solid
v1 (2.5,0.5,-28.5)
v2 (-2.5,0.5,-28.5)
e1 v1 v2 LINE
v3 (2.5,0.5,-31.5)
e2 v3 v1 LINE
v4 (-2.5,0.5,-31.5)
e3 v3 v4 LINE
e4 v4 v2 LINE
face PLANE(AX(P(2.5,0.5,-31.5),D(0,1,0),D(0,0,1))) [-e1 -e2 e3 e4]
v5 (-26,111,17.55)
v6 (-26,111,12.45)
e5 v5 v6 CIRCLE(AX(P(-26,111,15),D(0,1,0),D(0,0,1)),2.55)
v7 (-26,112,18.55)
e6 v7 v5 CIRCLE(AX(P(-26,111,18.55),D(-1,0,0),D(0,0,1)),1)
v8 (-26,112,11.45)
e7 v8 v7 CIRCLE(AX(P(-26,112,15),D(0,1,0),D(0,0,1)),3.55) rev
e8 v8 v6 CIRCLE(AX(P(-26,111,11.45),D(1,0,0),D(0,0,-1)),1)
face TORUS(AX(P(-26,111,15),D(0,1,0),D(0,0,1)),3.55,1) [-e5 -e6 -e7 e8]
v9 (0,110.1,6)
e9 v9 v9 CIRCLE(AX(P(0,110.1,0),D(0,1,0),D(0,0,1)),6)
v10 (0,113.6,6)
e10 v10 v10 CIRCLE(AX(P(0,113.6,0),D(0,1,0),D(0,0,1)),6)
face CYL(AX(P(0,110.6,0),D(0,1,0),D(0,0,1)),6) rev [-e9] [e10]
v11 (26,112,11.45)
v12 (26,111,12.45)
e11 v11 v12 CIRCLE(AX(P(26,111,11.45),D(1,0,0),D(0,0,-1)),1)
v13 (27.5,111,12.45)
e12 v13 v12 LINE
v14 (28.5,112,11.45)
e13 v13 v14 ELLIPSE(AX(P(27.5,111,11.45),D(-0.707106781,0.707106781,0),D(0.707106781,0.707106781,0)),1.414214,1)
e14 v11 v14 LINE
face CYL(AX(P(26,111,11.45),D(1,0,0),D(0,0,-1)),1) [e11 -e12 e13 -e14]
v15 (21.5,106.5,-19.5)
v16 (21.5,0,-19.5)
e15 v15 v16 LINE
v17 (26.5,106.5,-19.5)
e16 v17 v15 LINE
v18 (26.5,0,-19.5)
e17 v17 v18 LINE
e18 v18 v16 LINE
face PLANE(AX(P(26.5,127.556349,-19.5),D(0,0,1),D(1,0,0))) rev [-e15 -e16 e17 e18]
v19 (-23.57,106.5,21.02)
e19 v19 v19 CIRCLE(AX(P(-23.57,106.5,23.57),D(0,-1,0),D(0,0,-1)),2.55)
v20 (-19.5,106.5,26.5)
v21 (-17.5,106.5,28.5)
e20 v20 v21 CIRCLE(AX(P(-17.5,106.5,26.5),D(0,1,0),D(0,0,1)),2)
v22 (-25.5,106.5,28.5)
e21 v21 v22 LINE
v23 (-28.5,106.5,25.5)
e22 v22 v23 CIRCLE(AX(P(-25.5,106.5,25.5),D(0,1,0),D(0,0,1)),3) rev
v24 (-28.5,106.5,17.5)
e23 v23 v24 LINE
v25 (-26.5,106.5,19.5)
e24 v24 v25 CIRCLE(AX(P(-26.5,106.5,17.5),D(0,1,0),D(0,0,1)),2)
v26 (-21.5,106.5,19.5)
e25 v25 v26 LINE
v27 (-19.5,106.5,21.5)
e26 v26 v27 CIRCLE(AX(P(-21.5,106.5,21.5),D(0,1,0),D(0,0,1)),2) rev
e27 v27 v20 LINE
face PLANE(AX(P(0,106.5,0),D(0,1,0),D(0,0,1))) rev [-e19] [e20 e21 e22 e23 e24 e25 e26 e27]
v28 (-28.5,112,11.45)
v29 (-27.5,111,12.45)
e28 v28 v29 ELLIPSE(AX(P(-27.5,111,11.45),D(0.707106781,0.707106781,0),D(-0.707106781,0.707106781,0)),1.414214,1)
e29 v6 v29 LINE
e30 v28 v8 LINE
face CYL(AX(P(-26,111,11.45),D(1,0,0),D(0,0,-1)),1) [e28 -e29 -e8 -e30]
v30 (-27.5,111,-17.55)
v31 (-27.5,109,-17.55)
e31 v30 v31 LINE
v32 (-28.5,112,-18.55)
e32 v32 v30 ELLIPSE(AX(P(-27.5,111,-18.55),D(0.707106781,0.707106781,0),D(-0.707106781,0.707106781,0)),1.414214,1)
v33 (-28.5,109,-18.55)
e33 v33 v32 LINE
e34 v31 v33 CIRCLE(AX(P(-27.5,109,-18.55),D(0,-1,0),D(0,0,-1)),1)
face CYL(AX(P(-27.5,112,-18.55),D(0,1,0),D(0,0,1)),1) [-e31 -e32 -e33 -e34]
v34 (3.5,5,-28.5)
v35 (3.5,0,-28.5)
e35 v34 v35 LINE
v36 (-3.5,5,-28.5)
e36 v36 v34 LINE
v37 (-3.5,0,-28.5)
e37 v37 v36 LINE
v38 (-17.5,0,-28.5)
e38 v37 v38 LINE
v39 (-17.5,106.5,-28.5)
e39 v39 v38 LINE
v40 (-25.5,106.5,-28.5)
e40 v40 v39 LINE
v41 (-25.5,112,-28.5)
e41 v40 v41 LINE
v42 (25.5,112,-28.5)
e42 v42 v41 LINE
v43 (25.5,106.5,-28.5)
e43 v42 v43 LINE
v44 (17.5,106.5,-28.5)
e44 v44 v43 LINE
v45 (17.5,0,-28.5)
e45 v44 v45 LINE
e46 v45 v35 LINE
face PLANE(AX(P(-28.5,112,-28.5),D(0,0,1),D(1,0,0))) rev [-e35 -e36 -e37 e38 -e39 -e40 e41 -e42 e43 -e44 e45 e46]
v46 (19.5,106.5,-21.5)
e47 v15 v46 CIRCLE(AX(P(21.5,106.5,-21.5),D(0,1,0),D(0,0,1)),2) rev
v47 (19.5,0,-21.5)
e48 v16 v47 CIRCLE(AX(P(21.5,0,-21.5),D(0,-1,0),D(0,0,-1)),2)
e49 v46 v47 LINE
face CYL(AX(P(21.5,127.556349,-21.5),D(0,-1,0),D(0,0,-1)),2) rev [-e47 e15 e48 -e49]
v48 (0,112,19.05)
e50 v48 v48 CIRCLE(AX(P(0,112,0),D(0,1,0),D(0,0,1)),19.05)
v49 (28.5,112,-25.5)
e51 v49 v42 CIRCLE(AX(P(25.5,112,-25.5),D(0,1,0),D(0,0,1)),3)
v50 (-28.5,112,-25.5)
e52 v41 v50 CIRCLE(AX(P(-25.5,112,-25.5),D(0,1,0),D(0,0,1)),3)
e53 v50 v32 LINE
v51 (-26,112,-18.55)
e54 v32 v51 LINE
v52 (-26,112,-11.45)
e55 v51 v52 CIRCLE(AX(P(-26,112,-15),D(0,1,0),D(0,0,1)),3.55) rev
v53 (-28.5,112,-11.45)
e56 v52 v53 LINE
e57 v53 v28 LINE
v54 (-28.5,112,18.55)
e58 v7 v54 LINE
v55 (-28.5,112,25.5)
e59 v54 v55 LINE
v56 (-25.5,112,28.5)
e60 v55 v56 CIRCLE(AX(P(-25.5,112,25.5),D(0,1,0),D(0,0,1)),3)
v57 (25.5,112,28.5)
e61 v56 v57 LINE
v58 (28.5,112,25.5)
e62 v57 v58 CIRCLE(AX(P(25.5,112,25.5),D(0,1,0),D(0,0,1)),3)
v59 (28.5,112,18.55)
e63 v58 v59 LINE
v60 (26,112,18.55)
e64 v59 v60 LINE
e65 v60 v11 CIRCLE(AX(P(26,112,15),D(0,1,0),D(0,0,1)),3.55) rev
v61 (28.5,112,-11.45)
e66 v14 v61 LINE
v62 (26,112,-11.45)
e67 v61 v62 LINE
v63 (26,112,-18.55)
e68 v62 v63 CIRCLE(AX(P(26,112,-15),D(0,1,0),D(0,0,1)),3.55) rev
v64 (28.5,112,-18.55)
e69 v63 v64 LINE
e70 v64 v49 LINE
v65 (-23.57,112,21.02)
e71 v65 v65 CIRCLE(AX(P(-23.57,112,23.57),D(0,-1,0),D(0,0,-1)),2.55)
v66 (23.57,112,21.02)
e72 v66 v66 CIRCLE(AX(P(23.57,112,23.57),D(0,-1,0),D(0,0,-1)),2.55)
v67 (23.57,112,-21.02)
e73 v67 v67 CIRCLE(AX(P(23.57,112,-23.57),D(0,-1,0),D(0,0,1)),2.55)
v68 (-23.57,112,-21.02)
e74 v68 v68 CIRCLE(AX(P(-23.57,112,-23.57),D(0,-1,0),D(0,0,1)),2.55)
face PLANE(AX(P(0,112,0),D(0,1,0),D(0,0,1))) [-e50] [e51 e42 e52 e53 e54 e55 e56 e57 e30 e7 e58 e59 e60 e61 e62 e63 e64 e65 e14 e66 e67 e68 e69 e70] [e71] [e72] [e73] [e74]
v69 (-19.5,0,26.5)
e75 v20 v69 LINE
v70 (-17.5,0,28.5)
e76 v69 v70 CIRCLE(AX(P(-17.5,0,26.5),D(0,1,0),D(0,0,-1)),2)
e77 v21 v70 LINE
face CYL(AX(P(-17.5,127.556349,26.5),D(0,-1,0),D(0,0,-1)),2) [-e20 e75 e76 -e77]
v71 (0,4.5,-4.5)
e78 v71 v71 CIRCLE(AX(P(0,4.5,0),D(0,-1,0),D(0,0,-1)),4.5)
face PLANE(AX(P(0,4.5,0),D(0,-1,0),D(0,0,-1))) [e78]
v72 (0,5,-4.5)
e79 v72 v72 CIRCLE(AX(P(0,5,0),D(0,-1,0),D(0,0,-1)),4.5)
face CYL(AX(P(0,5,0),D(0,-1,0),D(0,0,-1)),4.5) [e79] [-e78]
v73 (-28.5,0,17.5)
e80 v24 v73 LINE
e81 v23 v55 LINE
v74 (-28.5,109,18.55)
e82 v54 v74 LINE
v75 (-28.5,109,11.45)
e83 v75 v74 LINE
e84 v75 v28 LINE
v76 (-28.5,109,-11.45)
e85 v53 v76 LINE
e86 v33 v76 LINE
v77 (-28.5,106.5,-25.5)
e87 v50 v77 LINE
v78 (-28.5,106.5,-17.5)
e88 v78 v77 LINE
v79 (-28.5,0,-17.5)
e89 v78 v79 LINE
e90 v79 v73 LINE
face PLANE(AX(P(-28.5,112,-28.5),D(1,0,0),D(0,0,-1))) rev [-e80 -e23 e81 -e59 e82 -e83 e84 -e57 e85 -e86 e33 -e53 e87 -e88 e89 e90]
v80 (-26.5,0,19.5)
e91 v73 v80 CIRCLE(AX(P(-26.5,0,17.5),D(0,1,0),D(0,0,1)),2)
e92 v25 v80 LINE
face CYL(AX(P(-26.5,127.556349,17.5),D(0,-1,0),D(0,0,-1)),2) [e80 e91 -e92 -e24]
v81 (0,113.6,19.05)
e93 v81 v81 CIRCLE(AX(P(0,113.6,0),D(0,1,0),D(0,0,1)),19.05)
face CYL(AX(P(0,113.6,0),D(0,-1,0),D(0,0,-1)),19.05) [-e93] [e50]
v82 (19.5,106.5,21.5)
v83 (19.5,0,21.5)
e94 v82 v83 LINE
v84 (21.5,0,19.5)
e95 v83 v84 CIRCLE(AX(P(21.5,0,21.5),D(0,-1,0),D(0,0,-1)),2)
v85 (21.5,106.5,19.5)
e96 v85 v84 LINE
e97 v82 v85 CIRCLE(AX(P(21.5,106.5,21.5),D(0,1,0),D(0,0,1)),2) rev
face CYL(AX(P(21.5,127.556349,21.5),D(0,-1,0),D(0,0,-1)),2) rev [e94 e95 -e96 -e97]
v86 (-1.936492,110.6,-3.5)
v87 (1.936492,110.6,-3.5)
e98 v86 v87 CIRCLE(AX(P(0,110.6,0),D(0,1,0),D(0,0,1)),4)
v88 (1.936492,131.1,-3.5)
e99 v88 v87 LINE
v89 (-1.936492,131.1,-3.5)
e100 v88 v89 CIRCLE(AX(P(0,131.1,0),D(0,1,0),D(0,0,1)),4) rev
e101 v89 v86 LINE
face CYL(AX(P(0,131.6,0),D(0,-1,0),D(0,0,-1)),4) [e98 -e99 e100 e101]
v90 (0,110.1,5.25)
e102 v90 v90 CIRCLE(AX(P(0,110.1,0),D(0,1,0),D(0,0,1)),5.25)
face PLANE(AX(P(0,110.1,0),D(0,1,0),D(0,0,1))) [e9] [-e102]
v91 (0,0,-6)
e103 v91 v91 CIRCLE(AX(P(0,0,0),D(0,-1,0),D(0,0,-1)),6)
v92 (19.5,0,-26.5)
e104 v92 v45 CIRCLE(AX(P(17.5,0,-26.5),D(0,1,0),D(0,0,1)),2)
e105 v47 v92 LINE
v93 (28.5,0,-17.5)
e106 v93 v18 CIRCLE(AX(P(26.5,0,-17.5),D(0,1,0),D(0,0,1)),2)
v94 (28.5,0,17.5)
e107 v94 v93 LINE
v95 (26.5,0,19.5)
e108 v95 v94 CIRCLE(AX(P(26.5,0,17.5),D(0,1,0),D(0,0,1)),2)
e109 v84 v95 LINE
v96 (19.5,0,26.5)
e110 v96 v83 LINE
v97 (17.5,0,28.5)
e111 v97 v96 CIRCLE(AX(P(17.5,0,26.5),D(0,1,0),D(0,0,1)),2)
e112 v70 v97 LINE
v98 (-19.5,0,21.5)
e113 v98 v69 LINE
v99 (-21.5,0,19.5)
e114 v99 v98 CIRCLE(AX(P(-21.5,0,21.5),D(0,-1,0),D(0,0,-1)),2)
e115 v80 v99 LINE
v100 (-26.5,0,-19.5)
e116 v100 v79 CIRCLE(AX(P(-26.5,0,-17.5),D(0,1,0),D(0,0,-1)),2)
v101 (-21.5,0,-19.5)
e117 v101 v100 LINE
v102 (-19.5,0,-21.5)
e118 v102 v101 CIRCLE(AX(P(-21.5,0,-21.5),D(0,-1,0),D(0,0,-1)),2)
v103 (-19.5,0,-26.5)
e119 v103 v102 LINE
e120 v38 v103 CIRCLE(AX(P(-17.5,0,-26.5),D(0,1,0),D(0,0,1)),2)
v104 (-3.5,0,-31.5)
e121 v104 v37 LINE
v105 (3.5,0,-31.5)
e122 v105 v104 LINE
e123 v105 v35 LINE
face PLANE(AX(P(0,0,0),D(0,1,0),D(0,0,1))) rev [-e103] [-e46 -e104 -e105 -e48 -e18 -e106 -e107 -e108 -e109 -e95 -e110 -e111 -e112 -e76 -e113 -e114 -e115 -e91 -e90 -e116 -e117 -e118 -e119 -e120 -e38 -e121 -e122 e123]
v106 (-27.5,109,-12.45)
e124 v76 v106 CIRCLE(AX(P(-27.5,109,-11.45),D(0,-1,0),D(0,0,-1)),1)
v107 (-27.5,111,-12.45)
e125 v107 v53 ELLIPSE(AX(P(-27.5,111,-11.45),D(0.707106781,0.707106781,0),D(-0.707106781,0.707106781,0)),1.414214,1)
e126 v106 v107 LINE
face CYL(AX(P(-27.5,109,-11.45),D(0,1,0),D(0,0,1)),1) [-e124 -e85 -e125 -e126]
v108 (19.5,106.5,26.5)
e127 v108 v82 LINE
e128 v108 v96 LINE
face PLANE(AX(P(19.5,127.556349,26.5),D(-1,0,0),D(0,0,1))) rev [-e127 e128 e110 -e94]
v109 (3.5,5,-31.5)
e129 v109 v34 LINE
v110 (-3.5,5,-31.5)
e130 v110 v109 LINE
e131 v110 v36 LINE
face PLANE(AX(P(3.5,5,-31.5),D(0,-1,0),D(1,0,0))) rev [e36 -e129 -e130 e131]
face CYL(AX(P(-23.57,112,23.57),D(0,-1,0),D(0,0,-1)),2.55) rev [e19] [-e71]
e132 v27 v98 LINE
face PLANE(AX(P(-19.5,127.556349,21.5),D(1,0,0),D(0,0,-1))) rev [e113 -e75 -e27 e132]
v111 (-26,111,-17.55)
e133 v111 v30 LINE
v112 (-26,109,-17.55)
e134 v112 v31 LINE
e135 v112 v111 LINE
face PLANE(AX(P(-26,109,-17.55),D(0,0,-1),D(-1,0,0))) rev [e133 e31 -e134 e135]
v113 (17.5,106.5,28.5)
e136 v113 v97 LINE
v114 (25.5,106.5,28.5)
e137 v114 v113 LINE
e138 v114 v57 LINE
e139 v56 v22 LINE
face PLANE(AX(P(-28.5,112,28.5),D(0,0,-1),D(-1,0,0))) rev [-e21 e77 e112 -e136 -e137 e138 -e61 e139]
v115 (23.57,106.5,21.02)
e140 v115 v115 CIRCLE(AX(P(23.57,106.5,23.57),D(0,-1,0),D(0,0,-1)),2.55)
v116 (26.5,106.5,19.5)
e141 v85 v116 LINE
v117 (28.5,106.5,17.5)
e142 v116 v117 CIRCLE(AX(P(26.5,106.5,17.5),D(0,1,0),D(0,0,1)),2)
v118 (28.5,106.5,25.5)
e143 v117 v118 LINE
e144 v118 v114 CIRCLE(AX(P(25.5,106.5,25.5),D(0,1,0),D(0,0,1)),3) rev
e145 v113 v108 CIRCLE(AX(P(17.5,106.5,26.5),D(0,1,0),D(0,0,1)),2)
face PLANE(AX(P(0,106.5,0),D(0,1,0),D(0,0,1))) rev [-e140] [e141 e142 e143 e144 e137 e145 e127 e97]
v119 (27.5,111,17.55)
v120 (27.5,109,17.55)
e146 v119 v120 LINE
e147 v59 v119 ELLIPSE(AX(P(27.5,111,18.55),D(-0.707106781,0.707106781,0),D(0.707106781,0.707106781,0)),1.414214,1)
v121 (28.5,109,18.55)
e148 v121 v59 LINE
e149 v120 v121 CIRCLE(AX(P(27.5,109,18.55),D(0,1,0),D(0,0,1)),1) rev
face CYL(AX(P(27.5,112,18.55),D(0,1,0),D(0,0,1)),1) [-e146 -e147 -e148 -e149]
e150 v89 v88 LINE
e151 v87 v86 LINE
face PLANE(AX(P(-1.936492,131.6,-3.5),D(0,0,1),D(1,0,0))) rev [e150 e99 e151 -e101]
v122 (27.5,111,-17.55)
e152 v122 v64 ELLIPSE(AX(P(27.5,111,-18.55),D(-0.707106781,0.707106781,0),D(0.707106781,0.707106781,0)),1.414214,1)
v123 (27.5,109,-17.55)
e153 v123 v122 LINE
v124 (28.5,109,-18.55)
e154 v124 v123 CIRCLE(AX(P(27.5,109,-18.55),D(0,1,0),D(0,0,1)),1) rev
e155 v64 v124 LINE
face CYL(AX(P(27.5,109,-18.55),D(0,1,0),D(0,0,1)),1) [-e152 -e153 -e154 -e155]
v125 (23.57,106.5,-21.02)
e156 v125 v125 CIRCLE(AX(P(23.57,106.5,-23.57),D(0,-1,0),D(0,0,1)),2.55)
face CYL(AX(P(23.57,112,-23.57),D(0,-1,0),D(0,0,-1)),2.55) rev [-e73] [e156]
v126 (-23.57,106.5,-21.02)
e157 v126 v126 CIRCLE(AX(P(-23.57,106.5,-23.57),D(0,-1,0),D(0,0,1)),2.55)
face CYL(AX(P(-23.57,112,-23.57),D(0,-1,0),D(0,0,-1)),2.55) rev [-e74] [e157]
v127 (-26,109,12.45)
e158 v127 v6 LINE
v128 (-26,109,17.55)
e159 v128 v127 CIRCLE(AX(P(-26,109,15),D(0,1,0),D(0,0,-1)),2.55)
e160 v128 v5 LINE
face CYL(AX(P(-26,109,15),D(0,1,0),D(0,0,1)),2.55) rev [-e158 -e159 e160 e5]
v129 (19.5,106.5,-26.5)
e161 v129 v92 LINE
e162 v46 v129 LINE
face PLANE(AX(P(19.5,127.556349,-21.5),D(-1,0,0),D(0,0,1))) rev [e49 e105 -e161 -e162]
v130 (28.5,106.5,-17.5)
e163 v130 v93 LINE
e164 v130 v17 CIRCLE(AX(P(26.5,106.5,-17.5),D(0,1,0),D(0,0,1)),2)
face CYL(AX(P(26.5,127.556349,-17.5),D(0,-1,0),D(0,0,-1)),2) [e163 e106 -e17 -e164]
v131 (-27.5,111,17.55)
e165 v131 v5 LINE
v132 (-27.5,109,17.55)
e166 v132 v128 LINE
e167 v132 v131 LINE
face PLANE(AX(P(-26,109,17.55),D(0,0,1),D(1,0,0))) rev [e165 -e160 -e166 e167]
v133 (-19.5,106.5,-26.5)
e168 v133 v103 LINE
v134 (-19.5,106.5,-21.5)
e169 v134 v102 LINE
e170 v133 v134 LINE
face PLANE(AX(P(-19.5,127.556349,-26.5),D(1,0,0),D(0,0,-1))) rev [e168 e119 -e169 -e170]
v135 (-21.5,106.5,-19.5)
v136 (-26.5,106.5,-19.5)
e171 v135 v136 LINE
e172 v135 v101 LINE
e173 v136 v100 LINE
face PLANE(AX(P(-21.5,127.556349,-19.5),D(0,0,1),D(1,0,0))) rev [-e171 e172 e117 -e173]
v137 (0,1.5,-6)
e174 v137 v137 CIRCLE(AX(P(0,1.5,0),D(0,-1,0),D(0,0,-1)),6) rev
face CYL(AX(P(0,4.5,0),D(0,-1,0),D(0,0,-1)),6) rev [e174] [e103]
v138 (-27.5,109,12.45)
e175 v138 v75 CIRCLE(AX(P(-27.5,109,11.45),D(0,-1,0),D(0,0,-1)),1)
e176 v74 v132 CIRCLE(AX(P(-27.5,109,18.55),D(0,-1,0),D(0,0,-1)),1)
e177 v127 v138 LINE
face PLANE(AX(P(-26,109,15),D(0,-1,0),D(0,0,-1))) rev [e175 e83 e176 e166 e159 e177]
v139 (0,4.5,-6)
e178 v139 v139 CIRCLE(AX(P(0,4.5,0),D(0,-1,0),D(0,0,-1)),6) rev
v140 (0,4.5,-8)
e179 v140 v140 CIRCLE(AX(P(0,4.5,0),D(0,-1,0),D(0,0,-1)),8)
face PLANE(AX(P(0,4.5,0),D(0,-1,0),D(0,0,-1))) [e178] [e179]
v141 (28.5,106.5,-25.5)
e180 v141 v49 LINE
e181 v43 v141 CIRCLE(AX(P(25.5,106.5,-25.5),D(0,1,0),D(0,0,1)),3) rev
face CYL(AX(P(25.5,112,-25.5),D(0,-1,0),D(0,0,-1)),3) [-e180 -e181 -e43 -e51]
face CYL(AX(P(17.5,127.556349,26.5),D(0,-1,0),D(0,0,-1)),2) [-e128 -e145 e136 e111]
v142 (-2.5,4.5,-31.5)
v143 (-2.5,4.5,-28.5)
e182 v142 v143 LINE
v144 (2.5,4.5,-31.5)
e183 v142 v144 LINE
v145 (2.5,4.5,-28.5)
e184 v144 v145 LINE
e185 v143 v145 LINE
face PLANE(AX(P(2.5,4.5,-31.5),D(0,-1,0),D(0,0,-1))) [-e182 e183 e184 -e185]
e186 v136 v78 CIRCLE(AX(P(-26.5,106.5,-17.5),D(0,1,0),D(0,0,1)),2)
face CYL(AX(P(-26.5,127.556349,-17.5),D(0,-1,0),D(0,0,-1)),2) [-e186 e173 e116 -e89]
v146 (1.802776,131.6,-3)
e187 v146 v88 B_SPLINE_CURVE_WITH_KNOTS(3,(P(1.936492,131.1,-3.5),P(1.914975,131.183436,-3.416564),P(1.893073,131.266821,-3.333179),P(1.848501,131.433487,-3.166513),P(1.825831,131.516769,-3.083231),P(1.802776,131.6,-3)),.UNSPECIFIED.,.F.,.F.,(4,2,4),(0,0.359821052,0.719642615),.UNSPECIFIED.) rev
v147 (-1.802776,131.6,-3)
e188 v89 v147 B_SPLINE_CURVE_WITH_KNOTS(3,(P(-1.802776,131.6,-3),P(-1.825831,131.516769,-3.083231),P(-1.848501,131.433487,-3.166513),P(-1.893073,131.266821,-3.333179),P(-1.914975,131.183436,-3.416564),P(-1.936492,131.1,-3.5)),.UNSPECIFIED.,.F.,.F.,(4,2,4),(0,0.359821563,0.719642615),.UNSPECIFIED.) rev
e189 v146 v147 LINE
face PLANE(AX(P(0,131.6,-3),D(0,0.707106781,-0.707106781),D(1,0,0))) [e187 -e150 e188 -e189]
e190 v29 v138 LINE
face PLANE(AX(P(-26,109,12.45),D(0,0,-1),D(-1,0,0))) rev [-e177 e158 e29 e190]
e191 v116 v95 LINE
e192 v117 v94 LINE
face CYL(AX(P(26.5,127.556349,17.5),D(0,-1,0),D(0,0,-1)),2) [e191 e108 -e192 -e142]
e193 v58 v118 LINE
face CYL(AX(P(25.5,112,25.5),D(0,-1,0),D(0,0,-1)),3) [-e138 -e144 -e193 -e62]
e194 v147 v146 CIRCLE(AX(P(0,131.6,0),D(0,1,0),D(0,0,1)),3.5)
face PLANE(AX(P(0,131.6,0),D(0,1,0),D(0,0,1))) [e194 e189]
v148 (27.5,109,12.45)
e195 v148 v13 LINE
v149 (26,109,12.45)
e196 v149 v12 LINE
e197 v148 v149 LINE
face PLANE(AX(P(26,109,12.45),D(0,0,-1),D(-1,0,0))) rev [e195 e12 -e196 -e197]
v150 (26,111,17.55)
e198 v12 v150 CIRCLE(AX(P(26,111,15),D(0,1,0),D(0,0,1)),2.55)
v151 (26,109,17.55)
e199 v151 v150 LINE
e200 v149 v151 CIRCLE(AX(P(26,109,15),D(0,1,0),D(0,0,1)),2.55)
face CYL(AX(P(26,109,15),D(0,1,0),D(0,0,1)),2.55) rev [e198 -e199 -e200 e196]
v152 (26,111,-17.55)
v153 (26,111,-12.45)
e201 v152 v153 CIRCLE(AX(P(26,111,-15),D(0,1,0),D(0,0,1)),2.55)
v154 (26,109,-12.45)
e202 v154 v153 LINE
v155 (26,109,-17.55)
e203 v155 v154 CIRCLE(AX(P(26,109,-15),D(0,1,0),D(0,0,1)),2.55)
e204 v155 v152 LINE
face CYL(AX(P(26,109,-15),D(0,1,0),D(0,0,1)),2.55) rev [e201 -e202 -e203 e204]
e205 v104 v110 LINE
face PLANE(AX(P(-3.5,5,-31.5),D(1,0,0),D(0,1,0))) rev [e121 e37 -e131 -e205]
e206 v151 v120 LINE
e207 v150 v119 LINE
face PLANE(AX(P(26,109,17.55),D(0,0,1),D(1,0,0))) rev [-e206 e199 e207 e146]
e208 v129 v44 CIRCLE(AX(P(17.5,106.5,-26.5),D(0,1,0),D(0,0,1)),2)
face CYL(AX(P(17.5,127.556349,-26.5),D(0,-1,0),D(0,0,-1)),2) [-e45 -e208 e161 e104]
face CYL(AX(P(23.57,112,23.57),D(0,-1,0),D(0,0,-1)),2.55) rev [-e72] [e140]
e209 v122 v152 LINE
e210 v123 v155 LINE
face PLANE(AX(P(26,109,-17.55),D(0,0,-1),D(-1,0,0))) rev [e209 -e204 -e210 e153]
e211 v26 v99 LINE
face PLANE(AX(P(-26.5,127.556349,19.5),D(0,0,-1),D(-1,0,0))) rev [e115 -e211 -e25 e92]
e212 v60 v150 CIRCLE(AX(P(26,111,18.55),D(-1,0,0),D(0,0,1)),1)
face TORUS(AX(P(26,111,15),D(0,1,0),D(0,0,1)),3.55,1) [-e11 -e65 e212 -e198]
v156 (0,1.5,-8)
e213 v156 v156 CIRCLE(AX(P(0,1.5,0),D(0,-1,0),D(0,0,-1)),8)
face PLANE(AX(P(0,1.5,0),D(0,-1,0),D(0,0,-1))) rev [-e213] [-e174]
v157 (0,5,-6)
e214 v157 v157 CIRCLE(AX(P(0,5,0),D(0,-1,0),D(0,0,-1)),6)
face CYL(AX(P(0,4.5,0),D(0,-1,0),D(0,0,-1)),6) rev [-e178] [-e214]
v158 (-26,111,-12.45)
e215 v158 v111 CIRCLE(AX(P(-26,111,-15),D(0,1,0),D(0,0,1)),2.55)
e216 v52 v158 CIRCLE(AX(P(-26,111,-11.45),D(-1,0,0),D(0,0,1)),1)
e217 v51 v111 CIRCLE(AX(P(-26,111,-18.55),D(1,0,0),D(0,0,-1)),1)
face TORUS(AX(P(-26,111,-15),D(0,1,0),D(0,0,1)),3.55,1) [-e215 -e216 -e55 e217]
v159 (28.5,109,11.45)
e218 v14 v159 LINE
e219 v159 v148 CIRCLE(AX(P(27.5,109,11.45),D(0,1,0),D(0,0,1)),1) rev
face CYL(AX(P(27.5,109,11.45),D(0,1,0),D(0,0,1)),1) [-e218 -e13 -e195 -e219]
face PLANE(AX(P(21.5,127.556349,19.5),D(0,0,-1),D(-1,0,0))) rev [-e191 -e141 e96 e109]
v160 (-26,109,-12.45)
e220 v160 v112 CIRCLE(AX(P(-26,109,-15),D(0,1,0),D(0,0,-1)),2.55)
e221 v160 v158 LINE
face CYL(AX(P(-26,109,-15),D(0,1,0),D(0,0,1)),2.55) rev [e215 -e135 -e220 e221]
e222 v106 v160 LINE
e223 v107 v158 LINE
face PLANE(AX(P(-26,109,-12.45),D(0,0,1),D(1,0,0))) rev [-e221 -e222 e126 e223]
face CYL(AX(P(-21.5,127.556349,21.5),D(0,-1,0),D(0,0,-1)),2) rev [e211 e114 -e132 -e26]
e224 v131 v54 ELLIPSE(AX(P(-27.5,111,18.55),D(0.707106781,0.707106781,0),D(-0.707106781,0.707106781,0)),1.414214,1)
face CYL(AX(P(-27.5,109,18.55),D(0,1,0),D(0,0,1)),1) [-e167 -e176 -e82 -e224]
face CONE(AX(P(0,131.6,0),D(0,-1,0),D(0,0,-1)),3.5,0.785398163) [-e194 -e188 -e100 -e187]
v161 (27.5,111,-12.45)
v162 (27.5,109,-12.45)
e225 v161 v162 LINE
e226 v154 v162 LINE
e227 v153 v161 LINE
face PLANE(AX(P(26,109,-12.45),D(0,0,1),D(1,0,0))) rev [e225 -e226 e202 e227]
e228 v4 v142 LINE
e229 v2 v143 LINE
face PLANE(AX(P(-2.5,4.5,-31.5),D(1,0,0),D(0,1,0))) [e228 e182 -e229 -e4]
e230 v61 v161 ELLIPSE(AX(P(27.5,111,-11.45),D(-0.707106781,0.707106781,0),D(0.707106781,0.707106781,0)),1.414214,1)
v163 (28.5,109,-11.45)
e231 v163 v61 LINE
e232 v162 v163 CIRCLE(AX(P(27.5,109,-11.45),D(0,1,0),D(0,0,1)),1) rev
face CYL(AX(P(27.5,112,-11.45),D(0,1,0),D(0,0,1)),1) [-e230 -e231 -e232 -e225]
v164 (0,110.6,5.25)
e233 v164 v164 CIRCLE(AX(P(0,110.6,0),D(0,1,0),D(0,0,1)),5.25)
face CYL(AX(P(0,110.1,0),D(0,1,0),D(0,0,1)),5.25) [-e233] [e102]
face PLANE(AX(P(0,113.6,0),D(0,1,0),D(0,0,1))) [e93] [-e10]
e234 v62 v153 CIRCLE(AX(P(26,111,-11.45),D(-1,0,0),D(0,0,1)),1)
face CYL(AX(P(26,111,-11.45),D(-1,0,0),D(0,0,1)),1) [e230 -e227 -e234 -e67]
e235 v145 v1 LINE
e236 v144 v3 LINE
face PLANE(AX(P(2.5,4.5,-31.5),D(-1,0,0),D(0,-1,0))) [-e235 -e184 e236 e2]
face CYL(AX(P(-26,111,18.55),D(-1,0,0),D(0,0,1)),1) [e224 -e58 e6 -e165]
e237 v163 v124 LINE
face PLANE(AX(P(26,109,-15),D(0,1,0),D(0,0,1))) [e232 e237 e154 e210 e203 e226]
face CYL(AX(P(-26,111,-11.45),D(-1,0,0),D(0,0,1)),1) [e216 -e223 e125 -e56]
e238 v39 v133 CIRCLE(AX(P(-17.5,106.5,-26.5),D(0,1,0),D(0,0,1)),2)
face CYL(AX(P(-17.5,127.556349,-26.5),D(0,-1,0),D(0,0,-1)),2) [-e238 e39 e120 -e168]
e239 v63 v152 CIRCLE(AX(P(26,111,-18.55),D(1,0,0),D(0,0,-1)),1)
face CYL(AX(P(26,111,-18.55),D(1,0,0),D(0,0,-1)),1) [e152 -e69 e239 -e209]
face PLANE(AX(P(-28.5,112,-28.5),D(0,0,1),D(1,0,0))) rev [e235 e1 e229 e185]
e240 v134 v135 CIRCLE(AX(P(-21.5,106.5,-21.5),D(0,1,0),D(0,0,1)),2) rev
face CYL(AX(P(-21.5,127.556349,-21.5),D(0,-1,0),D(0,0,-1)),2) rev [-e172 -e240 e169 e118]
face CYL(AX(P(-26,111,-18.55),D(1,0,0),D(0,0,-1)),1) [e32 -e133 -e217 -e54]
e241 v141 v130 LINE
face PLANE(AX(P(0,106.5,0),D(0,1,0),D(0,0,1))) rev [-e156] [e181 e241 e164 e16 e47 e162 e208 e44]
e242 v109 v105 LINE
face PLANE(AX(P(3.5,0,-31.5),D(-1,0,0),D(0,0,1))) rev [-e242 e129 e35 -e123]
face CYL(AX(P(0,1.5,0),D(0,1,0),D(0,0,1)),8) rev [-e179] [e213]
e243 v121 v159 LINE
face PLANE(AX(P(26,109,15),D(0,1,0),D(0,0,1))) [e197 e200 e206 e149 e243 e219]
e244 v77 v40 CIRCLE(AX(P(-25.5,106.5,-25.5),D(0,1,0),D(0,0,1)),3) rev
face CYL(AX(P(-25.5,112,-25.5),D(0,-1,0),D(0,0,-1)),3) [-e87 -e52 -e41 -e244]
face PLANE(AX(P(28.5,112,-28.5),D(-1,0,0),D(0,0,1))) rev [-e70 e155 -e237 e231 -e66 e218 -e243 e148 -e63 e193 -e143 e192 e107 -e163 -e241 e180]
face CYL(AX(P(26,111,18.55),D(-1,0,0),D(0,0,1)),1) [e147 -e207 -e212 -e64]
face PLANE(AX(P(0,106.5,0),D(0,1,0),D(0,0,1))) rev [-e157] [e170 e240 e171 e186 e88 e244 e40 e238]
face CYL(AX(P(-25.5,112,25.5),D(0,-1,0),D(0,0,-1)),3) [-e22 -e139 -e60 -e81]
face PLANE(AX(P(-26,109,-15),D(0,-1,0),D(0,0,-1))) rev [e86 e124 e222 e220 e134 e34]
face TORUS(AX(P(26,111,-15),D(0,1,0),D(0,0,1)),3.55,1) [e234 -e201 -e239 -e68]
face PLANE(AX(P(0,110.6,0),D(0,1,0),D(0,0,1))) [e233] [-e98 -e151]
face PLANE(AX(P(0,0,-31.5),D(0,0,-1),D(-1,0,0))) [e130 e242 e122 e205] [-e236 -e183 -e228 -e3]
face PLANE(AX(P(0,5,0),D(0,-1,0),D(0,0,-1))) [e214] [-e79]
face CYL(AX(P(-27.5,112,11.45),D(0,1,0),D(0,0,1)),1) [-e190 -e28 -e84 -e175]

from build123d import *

# Parameters (mm, degrees)
SKETCH1_W                         = 57
SKETCH1_H                         = 57
MOTOR_RECTANGULAR_FRAME_DEPTH     = 112
MOTOR_SCREW_HOLE_LENGTHS_DEPTH    = 106.5
SKETCH3_R                         = 2.55
MOTOR_MOUNT_HOLES_DEPTH           = 114.87163826
SKETCH4_R                         = 6
REAR_BEARING_AND_SHAFT_DEPTH      = 4.5
SKETCH5_R                         = 6
SKETCH5_R_2                       = 4.5
REAR_BEARING_SHIELD_DEPTH         = 0.5
SKETCH6_R                         = 8
HOLLOWED_SECTION_REAR_DEPTH       = 3
SKETCH7_R                         = 19.05
FRONT_PLATFORM_EXTRUDE_DEPTH      = 1.6
FRONT_START                       = -3
SKETCH8_R                         = 6
FRONT_BEARING_DEPTH               = 3
FRONT_SHAFT_DEPTH                 = 21
FRONT_START_2                     = -0.5
SKETCH10_R                        = 6
SKETCH10_R_2                      = 5.25
FRONT_BEARING_SHEILD_DEPTH        = 0.5
MOTOR_SHAFT_CHAMFER_SIZE          = 0.5
MOTOR_FRONT_EDGE_FILLET_R         = 3
FRONT_COVER_SCREW_INDENTS_DEPTH   = 3
FRONT_COVER_SCREW_INDENT_FILLET_R = 1
SKETCH12_W                        = 7
SKETCH12_H                        = 5
SKETCH12_W_2                      = 5
SKETCH12_H_2                      = 4
WIRE_AREA_DEPTH                   = 3


with BuildPart() as part:
    # Sketch1 → Motor rectangular frame (new body)
    with BuildSketch(Plane(origin=(0, 0, 0), x_dir=(1, 0, 0), z_dir=(0, 1, 0))):
        Rectangle(SKETCH1_W, SKETCH1_H)
    extrude(amount=MOTOR_RECTANGULAR_FRAME_DEPTH)

    # Sketch2 → Motor screw hole lengths (cut)
    with BuildSketch(Plane.XZ):
        with BuildLine():
            Line((-26.5, 19.5), (-21.5, 19.5))
            ThreePointArc((-21.5, 19.5), (-20.085786438, 20.085786438), (-19.5, 21.5))
            Line((-19.5, 21.5), (-19.5, 26.5))
            ThreePointArc((-19.5, 26.5), (-18.914213562, 27.914213562), (-17.5, 28.5))
            Line((-17.5, 28.5), (-28.5, 28.5))
            Line((-28.5, 28.5), (-28.5, 17.5))
            ThreePointArc((-28.5, 17.5), (-27.914213562, 18.914213562), (-26.5, 19.5))
        make_face()
        with BuildLine():
            Line((19.5, 26.5), (19.5, 21.5))
            ThreePointArc((19.5, 21.5), (20.085786438, 20.085786438), (21.5, 19.5))
            Line((21.5, 19.5), (26.5, 19.5))
            ThreePointArc((26.5, 19.5), (27.914213562, 18.914213562), (28.5, 17.5))
            Line((28.5, 17.5), (28.5, 28.5))
            Line((28.5, 28.5), (17.5, 28.5))
            ThreePointArc((17.5, 28.5), (18.914213562, 27.914213562), (19.5, 26.5))
        make_face()
        with BuildLine():
            Line((26.5, -19.5), (21.5, -19.5))
            ThreePointArc((21.5, -19.5), (20.085786438, -20.085786438), (19.5, -21.5))
            Line((19.5, -21.5), (19.5, -26.5))
            ThreePointArc((19.5, -26.5), (18.914213562, -27.914213562), (17.5, -28.5))
            Line((17.5, -28.5), (28.5, -28.5))
            Line((28.5, -28.5), (28.5, -17.5))
            ThreePointArc((28.5, -17.5), (27.914213562, -18.914213562), (26.5, -19.5))
        make_face()
        with BuildLine():
            Line((-19.5, -26.5), (-19.5, -21.5))
            ThreePointArc((-19.5, -21.5), (-20.085786438, -20.085786438), (-21.5, -19.5))
            Line((-21.5, -19.5), (-26.5, -19.5))
            ThreePointArc((-26.5, -19.5), (-27.914213562, -18.914213562), (-28.5, -17.5))
            Line((-28.5, -17.5), (-28.5, -28.5))
            Line((-28.5, -28.5), (-17.5, -28.5))
            ThreePointArc((-17.5, -28.5), (-18.914213562, -27.914213562), (-19.5, -26.5))
        make_face()
    extrude(amount=-MOTOR_SCREW_HOLE_LENGTHS_DEPTH, mode=Mode.SUBTRACT)

    # Sketch3 → Motor mount holes (cut, through all)
    with BuildSketch(Plane.XZ.offset(-106.5)):
        with Locations(Location((-23.57, 23.57, 0), (0, 0, 270))):
            Circle(SKETCH3_R)
        with Locations(Location((23.57, 23.57, 0), (0, 0, 270))):
            Circle(SKETCH3_R)
        with Locations(Location((23.57, -23.57, 0), (0, 0, 90))):
            Circle(SKETCH3_R)
        with Locations(Location((-23.57, -23.57, 0), (0, 0, 90))):
            Circle(SKETCH3_R)
    extrude(amount=-MOTOR_MOUNT_HOLES_DEPTH, mode=Mode.SUBTRACT)

    # Sketch4 → Rear bearing and shaft (cut)
    with BuildSketch(Plane.XZ):
        with Locations(Location((0, 0, 0), (0, 0, 270))):
            Circle(SKETCH4_R)
    extrude(amount=-REAR_BEARING_AND_SHAFT_DEPTH, mode=Mode.SUBTRACT)

    # Sketch5 → Rear bearing shield (cut)
    with BuildSketch(Plane.XZ.offset(-4.5)):
        with Locations(Location((0, 0, 0), (0, 0, 270))):
            Circle(SKETCH5_R)
        with Locations(Location((0, 0, 0), (0, 0, 270))):
            Circle(SKETCH5_R_2, mode=Mode.SUBTRACT)
    extrude(amount=-REAR_BEARING_SHIELD_DEPTH, mode=Mode.SUBTRACT)

    # Sketch6 → Hollowed section (rear) (cut)
    with BuildSketch(Plane.XZ.offset(-4.5)):
        with Locations(Location((0, 0, 0), (0, 0, 270))):
            Circle(SKETCH6_R)
    extrude(amount=HOLLOWED_SECTION_REAR_DEPTH, mode=Mode.SUBTRACT)

    # Sketch7 → Front platform extrude (add)
    with BuildSketch(Plane(origin=(0, 112, 0), x_dir=(1, 0, 0), z_dir=(0, 1, 0))):
        with Locations(Location((0, 0, 0), (0, 0, 270))):
            Circle(SKETCH7_R)
    extrude(amount=FRONT_PLATFORM_EXTRUDE_DEPTH)

    # Sketch8 → Front bearing (cut)
    with BuildSketch(Plane(origin=(0, 113.6, 0), x_dir=(1, 0, 0), z_dir=(0, 1, 0)).offset(FRONT_START)):
        with Locations(Location((0, 0, 0), (0, 0, 90))):
            Circle(SKETCH8_R)
    extrude(amount=FRONT_BEARING_DEPTH, mode=Mode.SUBTRACT)

    # Sketch9 → Front shaft (add)
    with BuildSketch(Plane(origin=(0, 110.6, 0), x_dir=(1, 0, 0), z_dir=(0, 1, 0))):
        with BuildLine():
            Line((-1.936491673, 3.5), (1.936491673, 3.5))
            ThreePointArc((1.936491673, 3.5), (0, -4), (-1.936491673, 3.5))
        make_face()
    extrude(amount=FRONT_SHAFT_DEPTH)

    # Sketch10 → Front bearing sheild (cut)
    with BuildSketch(Plane(origin=(0, 110.6, 0), x_dir=(1, 0, 0), z_dir=(0, 1, 0)).offset(FRONT_START_2)):
        with Locations(Location((0, 0, 0), (0, 0, 90))):
            Circle(SKETCH10_R)
        with Locations(Location((0, 0, 0), (0, 0, 270))):
            Circle(SKETCH10_R_2, mode=Mode.SUBTRACT)
    extrude(amount=FRONT_BEARING_SHEILD_DEPTH, mode=Mode.SUBTRACT)

    # Motor shaft chamfer
    motor_shaft_chamfer_edges = [part.edges().sort_by_distance(p)[0] for p in [
        (0, 131.6, 4),
        (0, 131.6, -3.5),
    ]]
    chamfer(motor_shaft_chamfer_edges, length=MOTOR_SHAFT_CHAMFER_SIZE - 0.0001)  # a hair under: the kernel refuses the full size

    # Motor front edge fillet
    motor_front_edge_fillet_edges = [part.edges().sort_by_distance(p)[0] for p in [
        (28.5, 109.25, 28.5),
        (-28.5, 109.25, 28.5),
        (-28.5, 109.25, -28.5),
        (28.5, 109.25, -28.5),
    ]]
    fillet(motor_front_edge_fillet_edges, radius=MOTOR_FRONT_EDGE_FILLET_R)

    # Sketch11 → Front cover screw indents (cut)
    with BuildSketch(Plane(origin=(0, 112, 0), x_dir=(1, 0, 0), z_dir=(0, 1, 0))):
        with BuildLine():
            Line((26, 17.55), (28.5, 17.55))
            Line((28.5, 17.55), (28.5, 12.45))
            Line((28.5, 12.45), (26, 12.45))
            ThreePointArc((26, 12.45), (23.45, 15), (26, 17.55))
        make_face()
        with BuildLine():
            Line((26, -12.45), (28.5, -12.45))
            Line((28.5, -12.45), (28.5, -17.55))
            Line((28.5, -17.55), (26, -17.55))
            ThreePointArc((26, -17.55), (23.45, -15), (26, -12.45))
        make_face()
        with BuildLine():
            Line((-26, -12.45), (-28.5, -12.45))
            Line((-28.5, -12.45), (-28.5, -17.55))
            Line((-28.5, -17.55), (-26, -17.55))
            ThreePointArc((-26, -17.55), (-23.45, -15), (-26, -12.45))
        make_face()
        with BuildLine():
            Line((-26, 17.55), (-28.5, 17.55))
            Line((-28.5, 17.55), (-28.5, 12.45))
            Line((-28.5, 12.45), (-26, 12.45))
            ThreePointArc((-26, 12.45), (-23.45, 15), (-26, 17.55))
        make_face()
    extrude(amount=-FRONT_COVER_SCREW_INDENTS_DEPTH, mode=Mode.SUBTRACT)

    # Front cover screw indent fillet
    front_cover_screw_indent_fillet_edges = [part.edges().sort_by_distance(p)[0] for p in [
        (-28.5, 110.5, -12.45),
        (-28.5, 110.5, -17.55),
        (-23.45, 112, -15),
        (-27.25, 112, -17.55),
        (-27.25, 112, -12.45),
        (-28.5, 110.5, 17.55),
        (-28.5, 110.5, 12.45),
        (-23.45, 112, 15),
        (-27.25, 112, 12.45),
        (-27.25, 112, 17.55),
        (28.5, 110.5, 12.45),
        (28.5, 110.5, 17.55),
        (23.45, 112, 15),
        (27.25, 112, 17.55),
        (27.25, 112, 12.45),
        (28.5, 110.5, -17.55),
        (28.5, 110.5, -12.45),
        (23.45, 112, -15),
        (27.25, 112, -12.45),
        (27.25, 112, -17.55),
    ]]
    fillet(front_cover_screw_indent_fillet_edges, radius=FRONT_COVER_SCREW_INDENT_FILLET_R)

    # Sketch12 → Wire area (add)
    with BuildSketch(Plane(origin=(0, 0, -28.5), x_dir=(-1, 0, 0), z_dir=(0, 0, -1))):
        with Locations((0, 2.5)):
            Rectangle(SKETCH12_W, SKETCH12_H)
        with Locations((0, 2.5)):
            Rectangle(SKETCH12_W_2, SKETCH12_H_2, mode=Mode.SUBTRACT)
    extrude(amount=WIRE_AREA_DEPTH)


solid = part.part
